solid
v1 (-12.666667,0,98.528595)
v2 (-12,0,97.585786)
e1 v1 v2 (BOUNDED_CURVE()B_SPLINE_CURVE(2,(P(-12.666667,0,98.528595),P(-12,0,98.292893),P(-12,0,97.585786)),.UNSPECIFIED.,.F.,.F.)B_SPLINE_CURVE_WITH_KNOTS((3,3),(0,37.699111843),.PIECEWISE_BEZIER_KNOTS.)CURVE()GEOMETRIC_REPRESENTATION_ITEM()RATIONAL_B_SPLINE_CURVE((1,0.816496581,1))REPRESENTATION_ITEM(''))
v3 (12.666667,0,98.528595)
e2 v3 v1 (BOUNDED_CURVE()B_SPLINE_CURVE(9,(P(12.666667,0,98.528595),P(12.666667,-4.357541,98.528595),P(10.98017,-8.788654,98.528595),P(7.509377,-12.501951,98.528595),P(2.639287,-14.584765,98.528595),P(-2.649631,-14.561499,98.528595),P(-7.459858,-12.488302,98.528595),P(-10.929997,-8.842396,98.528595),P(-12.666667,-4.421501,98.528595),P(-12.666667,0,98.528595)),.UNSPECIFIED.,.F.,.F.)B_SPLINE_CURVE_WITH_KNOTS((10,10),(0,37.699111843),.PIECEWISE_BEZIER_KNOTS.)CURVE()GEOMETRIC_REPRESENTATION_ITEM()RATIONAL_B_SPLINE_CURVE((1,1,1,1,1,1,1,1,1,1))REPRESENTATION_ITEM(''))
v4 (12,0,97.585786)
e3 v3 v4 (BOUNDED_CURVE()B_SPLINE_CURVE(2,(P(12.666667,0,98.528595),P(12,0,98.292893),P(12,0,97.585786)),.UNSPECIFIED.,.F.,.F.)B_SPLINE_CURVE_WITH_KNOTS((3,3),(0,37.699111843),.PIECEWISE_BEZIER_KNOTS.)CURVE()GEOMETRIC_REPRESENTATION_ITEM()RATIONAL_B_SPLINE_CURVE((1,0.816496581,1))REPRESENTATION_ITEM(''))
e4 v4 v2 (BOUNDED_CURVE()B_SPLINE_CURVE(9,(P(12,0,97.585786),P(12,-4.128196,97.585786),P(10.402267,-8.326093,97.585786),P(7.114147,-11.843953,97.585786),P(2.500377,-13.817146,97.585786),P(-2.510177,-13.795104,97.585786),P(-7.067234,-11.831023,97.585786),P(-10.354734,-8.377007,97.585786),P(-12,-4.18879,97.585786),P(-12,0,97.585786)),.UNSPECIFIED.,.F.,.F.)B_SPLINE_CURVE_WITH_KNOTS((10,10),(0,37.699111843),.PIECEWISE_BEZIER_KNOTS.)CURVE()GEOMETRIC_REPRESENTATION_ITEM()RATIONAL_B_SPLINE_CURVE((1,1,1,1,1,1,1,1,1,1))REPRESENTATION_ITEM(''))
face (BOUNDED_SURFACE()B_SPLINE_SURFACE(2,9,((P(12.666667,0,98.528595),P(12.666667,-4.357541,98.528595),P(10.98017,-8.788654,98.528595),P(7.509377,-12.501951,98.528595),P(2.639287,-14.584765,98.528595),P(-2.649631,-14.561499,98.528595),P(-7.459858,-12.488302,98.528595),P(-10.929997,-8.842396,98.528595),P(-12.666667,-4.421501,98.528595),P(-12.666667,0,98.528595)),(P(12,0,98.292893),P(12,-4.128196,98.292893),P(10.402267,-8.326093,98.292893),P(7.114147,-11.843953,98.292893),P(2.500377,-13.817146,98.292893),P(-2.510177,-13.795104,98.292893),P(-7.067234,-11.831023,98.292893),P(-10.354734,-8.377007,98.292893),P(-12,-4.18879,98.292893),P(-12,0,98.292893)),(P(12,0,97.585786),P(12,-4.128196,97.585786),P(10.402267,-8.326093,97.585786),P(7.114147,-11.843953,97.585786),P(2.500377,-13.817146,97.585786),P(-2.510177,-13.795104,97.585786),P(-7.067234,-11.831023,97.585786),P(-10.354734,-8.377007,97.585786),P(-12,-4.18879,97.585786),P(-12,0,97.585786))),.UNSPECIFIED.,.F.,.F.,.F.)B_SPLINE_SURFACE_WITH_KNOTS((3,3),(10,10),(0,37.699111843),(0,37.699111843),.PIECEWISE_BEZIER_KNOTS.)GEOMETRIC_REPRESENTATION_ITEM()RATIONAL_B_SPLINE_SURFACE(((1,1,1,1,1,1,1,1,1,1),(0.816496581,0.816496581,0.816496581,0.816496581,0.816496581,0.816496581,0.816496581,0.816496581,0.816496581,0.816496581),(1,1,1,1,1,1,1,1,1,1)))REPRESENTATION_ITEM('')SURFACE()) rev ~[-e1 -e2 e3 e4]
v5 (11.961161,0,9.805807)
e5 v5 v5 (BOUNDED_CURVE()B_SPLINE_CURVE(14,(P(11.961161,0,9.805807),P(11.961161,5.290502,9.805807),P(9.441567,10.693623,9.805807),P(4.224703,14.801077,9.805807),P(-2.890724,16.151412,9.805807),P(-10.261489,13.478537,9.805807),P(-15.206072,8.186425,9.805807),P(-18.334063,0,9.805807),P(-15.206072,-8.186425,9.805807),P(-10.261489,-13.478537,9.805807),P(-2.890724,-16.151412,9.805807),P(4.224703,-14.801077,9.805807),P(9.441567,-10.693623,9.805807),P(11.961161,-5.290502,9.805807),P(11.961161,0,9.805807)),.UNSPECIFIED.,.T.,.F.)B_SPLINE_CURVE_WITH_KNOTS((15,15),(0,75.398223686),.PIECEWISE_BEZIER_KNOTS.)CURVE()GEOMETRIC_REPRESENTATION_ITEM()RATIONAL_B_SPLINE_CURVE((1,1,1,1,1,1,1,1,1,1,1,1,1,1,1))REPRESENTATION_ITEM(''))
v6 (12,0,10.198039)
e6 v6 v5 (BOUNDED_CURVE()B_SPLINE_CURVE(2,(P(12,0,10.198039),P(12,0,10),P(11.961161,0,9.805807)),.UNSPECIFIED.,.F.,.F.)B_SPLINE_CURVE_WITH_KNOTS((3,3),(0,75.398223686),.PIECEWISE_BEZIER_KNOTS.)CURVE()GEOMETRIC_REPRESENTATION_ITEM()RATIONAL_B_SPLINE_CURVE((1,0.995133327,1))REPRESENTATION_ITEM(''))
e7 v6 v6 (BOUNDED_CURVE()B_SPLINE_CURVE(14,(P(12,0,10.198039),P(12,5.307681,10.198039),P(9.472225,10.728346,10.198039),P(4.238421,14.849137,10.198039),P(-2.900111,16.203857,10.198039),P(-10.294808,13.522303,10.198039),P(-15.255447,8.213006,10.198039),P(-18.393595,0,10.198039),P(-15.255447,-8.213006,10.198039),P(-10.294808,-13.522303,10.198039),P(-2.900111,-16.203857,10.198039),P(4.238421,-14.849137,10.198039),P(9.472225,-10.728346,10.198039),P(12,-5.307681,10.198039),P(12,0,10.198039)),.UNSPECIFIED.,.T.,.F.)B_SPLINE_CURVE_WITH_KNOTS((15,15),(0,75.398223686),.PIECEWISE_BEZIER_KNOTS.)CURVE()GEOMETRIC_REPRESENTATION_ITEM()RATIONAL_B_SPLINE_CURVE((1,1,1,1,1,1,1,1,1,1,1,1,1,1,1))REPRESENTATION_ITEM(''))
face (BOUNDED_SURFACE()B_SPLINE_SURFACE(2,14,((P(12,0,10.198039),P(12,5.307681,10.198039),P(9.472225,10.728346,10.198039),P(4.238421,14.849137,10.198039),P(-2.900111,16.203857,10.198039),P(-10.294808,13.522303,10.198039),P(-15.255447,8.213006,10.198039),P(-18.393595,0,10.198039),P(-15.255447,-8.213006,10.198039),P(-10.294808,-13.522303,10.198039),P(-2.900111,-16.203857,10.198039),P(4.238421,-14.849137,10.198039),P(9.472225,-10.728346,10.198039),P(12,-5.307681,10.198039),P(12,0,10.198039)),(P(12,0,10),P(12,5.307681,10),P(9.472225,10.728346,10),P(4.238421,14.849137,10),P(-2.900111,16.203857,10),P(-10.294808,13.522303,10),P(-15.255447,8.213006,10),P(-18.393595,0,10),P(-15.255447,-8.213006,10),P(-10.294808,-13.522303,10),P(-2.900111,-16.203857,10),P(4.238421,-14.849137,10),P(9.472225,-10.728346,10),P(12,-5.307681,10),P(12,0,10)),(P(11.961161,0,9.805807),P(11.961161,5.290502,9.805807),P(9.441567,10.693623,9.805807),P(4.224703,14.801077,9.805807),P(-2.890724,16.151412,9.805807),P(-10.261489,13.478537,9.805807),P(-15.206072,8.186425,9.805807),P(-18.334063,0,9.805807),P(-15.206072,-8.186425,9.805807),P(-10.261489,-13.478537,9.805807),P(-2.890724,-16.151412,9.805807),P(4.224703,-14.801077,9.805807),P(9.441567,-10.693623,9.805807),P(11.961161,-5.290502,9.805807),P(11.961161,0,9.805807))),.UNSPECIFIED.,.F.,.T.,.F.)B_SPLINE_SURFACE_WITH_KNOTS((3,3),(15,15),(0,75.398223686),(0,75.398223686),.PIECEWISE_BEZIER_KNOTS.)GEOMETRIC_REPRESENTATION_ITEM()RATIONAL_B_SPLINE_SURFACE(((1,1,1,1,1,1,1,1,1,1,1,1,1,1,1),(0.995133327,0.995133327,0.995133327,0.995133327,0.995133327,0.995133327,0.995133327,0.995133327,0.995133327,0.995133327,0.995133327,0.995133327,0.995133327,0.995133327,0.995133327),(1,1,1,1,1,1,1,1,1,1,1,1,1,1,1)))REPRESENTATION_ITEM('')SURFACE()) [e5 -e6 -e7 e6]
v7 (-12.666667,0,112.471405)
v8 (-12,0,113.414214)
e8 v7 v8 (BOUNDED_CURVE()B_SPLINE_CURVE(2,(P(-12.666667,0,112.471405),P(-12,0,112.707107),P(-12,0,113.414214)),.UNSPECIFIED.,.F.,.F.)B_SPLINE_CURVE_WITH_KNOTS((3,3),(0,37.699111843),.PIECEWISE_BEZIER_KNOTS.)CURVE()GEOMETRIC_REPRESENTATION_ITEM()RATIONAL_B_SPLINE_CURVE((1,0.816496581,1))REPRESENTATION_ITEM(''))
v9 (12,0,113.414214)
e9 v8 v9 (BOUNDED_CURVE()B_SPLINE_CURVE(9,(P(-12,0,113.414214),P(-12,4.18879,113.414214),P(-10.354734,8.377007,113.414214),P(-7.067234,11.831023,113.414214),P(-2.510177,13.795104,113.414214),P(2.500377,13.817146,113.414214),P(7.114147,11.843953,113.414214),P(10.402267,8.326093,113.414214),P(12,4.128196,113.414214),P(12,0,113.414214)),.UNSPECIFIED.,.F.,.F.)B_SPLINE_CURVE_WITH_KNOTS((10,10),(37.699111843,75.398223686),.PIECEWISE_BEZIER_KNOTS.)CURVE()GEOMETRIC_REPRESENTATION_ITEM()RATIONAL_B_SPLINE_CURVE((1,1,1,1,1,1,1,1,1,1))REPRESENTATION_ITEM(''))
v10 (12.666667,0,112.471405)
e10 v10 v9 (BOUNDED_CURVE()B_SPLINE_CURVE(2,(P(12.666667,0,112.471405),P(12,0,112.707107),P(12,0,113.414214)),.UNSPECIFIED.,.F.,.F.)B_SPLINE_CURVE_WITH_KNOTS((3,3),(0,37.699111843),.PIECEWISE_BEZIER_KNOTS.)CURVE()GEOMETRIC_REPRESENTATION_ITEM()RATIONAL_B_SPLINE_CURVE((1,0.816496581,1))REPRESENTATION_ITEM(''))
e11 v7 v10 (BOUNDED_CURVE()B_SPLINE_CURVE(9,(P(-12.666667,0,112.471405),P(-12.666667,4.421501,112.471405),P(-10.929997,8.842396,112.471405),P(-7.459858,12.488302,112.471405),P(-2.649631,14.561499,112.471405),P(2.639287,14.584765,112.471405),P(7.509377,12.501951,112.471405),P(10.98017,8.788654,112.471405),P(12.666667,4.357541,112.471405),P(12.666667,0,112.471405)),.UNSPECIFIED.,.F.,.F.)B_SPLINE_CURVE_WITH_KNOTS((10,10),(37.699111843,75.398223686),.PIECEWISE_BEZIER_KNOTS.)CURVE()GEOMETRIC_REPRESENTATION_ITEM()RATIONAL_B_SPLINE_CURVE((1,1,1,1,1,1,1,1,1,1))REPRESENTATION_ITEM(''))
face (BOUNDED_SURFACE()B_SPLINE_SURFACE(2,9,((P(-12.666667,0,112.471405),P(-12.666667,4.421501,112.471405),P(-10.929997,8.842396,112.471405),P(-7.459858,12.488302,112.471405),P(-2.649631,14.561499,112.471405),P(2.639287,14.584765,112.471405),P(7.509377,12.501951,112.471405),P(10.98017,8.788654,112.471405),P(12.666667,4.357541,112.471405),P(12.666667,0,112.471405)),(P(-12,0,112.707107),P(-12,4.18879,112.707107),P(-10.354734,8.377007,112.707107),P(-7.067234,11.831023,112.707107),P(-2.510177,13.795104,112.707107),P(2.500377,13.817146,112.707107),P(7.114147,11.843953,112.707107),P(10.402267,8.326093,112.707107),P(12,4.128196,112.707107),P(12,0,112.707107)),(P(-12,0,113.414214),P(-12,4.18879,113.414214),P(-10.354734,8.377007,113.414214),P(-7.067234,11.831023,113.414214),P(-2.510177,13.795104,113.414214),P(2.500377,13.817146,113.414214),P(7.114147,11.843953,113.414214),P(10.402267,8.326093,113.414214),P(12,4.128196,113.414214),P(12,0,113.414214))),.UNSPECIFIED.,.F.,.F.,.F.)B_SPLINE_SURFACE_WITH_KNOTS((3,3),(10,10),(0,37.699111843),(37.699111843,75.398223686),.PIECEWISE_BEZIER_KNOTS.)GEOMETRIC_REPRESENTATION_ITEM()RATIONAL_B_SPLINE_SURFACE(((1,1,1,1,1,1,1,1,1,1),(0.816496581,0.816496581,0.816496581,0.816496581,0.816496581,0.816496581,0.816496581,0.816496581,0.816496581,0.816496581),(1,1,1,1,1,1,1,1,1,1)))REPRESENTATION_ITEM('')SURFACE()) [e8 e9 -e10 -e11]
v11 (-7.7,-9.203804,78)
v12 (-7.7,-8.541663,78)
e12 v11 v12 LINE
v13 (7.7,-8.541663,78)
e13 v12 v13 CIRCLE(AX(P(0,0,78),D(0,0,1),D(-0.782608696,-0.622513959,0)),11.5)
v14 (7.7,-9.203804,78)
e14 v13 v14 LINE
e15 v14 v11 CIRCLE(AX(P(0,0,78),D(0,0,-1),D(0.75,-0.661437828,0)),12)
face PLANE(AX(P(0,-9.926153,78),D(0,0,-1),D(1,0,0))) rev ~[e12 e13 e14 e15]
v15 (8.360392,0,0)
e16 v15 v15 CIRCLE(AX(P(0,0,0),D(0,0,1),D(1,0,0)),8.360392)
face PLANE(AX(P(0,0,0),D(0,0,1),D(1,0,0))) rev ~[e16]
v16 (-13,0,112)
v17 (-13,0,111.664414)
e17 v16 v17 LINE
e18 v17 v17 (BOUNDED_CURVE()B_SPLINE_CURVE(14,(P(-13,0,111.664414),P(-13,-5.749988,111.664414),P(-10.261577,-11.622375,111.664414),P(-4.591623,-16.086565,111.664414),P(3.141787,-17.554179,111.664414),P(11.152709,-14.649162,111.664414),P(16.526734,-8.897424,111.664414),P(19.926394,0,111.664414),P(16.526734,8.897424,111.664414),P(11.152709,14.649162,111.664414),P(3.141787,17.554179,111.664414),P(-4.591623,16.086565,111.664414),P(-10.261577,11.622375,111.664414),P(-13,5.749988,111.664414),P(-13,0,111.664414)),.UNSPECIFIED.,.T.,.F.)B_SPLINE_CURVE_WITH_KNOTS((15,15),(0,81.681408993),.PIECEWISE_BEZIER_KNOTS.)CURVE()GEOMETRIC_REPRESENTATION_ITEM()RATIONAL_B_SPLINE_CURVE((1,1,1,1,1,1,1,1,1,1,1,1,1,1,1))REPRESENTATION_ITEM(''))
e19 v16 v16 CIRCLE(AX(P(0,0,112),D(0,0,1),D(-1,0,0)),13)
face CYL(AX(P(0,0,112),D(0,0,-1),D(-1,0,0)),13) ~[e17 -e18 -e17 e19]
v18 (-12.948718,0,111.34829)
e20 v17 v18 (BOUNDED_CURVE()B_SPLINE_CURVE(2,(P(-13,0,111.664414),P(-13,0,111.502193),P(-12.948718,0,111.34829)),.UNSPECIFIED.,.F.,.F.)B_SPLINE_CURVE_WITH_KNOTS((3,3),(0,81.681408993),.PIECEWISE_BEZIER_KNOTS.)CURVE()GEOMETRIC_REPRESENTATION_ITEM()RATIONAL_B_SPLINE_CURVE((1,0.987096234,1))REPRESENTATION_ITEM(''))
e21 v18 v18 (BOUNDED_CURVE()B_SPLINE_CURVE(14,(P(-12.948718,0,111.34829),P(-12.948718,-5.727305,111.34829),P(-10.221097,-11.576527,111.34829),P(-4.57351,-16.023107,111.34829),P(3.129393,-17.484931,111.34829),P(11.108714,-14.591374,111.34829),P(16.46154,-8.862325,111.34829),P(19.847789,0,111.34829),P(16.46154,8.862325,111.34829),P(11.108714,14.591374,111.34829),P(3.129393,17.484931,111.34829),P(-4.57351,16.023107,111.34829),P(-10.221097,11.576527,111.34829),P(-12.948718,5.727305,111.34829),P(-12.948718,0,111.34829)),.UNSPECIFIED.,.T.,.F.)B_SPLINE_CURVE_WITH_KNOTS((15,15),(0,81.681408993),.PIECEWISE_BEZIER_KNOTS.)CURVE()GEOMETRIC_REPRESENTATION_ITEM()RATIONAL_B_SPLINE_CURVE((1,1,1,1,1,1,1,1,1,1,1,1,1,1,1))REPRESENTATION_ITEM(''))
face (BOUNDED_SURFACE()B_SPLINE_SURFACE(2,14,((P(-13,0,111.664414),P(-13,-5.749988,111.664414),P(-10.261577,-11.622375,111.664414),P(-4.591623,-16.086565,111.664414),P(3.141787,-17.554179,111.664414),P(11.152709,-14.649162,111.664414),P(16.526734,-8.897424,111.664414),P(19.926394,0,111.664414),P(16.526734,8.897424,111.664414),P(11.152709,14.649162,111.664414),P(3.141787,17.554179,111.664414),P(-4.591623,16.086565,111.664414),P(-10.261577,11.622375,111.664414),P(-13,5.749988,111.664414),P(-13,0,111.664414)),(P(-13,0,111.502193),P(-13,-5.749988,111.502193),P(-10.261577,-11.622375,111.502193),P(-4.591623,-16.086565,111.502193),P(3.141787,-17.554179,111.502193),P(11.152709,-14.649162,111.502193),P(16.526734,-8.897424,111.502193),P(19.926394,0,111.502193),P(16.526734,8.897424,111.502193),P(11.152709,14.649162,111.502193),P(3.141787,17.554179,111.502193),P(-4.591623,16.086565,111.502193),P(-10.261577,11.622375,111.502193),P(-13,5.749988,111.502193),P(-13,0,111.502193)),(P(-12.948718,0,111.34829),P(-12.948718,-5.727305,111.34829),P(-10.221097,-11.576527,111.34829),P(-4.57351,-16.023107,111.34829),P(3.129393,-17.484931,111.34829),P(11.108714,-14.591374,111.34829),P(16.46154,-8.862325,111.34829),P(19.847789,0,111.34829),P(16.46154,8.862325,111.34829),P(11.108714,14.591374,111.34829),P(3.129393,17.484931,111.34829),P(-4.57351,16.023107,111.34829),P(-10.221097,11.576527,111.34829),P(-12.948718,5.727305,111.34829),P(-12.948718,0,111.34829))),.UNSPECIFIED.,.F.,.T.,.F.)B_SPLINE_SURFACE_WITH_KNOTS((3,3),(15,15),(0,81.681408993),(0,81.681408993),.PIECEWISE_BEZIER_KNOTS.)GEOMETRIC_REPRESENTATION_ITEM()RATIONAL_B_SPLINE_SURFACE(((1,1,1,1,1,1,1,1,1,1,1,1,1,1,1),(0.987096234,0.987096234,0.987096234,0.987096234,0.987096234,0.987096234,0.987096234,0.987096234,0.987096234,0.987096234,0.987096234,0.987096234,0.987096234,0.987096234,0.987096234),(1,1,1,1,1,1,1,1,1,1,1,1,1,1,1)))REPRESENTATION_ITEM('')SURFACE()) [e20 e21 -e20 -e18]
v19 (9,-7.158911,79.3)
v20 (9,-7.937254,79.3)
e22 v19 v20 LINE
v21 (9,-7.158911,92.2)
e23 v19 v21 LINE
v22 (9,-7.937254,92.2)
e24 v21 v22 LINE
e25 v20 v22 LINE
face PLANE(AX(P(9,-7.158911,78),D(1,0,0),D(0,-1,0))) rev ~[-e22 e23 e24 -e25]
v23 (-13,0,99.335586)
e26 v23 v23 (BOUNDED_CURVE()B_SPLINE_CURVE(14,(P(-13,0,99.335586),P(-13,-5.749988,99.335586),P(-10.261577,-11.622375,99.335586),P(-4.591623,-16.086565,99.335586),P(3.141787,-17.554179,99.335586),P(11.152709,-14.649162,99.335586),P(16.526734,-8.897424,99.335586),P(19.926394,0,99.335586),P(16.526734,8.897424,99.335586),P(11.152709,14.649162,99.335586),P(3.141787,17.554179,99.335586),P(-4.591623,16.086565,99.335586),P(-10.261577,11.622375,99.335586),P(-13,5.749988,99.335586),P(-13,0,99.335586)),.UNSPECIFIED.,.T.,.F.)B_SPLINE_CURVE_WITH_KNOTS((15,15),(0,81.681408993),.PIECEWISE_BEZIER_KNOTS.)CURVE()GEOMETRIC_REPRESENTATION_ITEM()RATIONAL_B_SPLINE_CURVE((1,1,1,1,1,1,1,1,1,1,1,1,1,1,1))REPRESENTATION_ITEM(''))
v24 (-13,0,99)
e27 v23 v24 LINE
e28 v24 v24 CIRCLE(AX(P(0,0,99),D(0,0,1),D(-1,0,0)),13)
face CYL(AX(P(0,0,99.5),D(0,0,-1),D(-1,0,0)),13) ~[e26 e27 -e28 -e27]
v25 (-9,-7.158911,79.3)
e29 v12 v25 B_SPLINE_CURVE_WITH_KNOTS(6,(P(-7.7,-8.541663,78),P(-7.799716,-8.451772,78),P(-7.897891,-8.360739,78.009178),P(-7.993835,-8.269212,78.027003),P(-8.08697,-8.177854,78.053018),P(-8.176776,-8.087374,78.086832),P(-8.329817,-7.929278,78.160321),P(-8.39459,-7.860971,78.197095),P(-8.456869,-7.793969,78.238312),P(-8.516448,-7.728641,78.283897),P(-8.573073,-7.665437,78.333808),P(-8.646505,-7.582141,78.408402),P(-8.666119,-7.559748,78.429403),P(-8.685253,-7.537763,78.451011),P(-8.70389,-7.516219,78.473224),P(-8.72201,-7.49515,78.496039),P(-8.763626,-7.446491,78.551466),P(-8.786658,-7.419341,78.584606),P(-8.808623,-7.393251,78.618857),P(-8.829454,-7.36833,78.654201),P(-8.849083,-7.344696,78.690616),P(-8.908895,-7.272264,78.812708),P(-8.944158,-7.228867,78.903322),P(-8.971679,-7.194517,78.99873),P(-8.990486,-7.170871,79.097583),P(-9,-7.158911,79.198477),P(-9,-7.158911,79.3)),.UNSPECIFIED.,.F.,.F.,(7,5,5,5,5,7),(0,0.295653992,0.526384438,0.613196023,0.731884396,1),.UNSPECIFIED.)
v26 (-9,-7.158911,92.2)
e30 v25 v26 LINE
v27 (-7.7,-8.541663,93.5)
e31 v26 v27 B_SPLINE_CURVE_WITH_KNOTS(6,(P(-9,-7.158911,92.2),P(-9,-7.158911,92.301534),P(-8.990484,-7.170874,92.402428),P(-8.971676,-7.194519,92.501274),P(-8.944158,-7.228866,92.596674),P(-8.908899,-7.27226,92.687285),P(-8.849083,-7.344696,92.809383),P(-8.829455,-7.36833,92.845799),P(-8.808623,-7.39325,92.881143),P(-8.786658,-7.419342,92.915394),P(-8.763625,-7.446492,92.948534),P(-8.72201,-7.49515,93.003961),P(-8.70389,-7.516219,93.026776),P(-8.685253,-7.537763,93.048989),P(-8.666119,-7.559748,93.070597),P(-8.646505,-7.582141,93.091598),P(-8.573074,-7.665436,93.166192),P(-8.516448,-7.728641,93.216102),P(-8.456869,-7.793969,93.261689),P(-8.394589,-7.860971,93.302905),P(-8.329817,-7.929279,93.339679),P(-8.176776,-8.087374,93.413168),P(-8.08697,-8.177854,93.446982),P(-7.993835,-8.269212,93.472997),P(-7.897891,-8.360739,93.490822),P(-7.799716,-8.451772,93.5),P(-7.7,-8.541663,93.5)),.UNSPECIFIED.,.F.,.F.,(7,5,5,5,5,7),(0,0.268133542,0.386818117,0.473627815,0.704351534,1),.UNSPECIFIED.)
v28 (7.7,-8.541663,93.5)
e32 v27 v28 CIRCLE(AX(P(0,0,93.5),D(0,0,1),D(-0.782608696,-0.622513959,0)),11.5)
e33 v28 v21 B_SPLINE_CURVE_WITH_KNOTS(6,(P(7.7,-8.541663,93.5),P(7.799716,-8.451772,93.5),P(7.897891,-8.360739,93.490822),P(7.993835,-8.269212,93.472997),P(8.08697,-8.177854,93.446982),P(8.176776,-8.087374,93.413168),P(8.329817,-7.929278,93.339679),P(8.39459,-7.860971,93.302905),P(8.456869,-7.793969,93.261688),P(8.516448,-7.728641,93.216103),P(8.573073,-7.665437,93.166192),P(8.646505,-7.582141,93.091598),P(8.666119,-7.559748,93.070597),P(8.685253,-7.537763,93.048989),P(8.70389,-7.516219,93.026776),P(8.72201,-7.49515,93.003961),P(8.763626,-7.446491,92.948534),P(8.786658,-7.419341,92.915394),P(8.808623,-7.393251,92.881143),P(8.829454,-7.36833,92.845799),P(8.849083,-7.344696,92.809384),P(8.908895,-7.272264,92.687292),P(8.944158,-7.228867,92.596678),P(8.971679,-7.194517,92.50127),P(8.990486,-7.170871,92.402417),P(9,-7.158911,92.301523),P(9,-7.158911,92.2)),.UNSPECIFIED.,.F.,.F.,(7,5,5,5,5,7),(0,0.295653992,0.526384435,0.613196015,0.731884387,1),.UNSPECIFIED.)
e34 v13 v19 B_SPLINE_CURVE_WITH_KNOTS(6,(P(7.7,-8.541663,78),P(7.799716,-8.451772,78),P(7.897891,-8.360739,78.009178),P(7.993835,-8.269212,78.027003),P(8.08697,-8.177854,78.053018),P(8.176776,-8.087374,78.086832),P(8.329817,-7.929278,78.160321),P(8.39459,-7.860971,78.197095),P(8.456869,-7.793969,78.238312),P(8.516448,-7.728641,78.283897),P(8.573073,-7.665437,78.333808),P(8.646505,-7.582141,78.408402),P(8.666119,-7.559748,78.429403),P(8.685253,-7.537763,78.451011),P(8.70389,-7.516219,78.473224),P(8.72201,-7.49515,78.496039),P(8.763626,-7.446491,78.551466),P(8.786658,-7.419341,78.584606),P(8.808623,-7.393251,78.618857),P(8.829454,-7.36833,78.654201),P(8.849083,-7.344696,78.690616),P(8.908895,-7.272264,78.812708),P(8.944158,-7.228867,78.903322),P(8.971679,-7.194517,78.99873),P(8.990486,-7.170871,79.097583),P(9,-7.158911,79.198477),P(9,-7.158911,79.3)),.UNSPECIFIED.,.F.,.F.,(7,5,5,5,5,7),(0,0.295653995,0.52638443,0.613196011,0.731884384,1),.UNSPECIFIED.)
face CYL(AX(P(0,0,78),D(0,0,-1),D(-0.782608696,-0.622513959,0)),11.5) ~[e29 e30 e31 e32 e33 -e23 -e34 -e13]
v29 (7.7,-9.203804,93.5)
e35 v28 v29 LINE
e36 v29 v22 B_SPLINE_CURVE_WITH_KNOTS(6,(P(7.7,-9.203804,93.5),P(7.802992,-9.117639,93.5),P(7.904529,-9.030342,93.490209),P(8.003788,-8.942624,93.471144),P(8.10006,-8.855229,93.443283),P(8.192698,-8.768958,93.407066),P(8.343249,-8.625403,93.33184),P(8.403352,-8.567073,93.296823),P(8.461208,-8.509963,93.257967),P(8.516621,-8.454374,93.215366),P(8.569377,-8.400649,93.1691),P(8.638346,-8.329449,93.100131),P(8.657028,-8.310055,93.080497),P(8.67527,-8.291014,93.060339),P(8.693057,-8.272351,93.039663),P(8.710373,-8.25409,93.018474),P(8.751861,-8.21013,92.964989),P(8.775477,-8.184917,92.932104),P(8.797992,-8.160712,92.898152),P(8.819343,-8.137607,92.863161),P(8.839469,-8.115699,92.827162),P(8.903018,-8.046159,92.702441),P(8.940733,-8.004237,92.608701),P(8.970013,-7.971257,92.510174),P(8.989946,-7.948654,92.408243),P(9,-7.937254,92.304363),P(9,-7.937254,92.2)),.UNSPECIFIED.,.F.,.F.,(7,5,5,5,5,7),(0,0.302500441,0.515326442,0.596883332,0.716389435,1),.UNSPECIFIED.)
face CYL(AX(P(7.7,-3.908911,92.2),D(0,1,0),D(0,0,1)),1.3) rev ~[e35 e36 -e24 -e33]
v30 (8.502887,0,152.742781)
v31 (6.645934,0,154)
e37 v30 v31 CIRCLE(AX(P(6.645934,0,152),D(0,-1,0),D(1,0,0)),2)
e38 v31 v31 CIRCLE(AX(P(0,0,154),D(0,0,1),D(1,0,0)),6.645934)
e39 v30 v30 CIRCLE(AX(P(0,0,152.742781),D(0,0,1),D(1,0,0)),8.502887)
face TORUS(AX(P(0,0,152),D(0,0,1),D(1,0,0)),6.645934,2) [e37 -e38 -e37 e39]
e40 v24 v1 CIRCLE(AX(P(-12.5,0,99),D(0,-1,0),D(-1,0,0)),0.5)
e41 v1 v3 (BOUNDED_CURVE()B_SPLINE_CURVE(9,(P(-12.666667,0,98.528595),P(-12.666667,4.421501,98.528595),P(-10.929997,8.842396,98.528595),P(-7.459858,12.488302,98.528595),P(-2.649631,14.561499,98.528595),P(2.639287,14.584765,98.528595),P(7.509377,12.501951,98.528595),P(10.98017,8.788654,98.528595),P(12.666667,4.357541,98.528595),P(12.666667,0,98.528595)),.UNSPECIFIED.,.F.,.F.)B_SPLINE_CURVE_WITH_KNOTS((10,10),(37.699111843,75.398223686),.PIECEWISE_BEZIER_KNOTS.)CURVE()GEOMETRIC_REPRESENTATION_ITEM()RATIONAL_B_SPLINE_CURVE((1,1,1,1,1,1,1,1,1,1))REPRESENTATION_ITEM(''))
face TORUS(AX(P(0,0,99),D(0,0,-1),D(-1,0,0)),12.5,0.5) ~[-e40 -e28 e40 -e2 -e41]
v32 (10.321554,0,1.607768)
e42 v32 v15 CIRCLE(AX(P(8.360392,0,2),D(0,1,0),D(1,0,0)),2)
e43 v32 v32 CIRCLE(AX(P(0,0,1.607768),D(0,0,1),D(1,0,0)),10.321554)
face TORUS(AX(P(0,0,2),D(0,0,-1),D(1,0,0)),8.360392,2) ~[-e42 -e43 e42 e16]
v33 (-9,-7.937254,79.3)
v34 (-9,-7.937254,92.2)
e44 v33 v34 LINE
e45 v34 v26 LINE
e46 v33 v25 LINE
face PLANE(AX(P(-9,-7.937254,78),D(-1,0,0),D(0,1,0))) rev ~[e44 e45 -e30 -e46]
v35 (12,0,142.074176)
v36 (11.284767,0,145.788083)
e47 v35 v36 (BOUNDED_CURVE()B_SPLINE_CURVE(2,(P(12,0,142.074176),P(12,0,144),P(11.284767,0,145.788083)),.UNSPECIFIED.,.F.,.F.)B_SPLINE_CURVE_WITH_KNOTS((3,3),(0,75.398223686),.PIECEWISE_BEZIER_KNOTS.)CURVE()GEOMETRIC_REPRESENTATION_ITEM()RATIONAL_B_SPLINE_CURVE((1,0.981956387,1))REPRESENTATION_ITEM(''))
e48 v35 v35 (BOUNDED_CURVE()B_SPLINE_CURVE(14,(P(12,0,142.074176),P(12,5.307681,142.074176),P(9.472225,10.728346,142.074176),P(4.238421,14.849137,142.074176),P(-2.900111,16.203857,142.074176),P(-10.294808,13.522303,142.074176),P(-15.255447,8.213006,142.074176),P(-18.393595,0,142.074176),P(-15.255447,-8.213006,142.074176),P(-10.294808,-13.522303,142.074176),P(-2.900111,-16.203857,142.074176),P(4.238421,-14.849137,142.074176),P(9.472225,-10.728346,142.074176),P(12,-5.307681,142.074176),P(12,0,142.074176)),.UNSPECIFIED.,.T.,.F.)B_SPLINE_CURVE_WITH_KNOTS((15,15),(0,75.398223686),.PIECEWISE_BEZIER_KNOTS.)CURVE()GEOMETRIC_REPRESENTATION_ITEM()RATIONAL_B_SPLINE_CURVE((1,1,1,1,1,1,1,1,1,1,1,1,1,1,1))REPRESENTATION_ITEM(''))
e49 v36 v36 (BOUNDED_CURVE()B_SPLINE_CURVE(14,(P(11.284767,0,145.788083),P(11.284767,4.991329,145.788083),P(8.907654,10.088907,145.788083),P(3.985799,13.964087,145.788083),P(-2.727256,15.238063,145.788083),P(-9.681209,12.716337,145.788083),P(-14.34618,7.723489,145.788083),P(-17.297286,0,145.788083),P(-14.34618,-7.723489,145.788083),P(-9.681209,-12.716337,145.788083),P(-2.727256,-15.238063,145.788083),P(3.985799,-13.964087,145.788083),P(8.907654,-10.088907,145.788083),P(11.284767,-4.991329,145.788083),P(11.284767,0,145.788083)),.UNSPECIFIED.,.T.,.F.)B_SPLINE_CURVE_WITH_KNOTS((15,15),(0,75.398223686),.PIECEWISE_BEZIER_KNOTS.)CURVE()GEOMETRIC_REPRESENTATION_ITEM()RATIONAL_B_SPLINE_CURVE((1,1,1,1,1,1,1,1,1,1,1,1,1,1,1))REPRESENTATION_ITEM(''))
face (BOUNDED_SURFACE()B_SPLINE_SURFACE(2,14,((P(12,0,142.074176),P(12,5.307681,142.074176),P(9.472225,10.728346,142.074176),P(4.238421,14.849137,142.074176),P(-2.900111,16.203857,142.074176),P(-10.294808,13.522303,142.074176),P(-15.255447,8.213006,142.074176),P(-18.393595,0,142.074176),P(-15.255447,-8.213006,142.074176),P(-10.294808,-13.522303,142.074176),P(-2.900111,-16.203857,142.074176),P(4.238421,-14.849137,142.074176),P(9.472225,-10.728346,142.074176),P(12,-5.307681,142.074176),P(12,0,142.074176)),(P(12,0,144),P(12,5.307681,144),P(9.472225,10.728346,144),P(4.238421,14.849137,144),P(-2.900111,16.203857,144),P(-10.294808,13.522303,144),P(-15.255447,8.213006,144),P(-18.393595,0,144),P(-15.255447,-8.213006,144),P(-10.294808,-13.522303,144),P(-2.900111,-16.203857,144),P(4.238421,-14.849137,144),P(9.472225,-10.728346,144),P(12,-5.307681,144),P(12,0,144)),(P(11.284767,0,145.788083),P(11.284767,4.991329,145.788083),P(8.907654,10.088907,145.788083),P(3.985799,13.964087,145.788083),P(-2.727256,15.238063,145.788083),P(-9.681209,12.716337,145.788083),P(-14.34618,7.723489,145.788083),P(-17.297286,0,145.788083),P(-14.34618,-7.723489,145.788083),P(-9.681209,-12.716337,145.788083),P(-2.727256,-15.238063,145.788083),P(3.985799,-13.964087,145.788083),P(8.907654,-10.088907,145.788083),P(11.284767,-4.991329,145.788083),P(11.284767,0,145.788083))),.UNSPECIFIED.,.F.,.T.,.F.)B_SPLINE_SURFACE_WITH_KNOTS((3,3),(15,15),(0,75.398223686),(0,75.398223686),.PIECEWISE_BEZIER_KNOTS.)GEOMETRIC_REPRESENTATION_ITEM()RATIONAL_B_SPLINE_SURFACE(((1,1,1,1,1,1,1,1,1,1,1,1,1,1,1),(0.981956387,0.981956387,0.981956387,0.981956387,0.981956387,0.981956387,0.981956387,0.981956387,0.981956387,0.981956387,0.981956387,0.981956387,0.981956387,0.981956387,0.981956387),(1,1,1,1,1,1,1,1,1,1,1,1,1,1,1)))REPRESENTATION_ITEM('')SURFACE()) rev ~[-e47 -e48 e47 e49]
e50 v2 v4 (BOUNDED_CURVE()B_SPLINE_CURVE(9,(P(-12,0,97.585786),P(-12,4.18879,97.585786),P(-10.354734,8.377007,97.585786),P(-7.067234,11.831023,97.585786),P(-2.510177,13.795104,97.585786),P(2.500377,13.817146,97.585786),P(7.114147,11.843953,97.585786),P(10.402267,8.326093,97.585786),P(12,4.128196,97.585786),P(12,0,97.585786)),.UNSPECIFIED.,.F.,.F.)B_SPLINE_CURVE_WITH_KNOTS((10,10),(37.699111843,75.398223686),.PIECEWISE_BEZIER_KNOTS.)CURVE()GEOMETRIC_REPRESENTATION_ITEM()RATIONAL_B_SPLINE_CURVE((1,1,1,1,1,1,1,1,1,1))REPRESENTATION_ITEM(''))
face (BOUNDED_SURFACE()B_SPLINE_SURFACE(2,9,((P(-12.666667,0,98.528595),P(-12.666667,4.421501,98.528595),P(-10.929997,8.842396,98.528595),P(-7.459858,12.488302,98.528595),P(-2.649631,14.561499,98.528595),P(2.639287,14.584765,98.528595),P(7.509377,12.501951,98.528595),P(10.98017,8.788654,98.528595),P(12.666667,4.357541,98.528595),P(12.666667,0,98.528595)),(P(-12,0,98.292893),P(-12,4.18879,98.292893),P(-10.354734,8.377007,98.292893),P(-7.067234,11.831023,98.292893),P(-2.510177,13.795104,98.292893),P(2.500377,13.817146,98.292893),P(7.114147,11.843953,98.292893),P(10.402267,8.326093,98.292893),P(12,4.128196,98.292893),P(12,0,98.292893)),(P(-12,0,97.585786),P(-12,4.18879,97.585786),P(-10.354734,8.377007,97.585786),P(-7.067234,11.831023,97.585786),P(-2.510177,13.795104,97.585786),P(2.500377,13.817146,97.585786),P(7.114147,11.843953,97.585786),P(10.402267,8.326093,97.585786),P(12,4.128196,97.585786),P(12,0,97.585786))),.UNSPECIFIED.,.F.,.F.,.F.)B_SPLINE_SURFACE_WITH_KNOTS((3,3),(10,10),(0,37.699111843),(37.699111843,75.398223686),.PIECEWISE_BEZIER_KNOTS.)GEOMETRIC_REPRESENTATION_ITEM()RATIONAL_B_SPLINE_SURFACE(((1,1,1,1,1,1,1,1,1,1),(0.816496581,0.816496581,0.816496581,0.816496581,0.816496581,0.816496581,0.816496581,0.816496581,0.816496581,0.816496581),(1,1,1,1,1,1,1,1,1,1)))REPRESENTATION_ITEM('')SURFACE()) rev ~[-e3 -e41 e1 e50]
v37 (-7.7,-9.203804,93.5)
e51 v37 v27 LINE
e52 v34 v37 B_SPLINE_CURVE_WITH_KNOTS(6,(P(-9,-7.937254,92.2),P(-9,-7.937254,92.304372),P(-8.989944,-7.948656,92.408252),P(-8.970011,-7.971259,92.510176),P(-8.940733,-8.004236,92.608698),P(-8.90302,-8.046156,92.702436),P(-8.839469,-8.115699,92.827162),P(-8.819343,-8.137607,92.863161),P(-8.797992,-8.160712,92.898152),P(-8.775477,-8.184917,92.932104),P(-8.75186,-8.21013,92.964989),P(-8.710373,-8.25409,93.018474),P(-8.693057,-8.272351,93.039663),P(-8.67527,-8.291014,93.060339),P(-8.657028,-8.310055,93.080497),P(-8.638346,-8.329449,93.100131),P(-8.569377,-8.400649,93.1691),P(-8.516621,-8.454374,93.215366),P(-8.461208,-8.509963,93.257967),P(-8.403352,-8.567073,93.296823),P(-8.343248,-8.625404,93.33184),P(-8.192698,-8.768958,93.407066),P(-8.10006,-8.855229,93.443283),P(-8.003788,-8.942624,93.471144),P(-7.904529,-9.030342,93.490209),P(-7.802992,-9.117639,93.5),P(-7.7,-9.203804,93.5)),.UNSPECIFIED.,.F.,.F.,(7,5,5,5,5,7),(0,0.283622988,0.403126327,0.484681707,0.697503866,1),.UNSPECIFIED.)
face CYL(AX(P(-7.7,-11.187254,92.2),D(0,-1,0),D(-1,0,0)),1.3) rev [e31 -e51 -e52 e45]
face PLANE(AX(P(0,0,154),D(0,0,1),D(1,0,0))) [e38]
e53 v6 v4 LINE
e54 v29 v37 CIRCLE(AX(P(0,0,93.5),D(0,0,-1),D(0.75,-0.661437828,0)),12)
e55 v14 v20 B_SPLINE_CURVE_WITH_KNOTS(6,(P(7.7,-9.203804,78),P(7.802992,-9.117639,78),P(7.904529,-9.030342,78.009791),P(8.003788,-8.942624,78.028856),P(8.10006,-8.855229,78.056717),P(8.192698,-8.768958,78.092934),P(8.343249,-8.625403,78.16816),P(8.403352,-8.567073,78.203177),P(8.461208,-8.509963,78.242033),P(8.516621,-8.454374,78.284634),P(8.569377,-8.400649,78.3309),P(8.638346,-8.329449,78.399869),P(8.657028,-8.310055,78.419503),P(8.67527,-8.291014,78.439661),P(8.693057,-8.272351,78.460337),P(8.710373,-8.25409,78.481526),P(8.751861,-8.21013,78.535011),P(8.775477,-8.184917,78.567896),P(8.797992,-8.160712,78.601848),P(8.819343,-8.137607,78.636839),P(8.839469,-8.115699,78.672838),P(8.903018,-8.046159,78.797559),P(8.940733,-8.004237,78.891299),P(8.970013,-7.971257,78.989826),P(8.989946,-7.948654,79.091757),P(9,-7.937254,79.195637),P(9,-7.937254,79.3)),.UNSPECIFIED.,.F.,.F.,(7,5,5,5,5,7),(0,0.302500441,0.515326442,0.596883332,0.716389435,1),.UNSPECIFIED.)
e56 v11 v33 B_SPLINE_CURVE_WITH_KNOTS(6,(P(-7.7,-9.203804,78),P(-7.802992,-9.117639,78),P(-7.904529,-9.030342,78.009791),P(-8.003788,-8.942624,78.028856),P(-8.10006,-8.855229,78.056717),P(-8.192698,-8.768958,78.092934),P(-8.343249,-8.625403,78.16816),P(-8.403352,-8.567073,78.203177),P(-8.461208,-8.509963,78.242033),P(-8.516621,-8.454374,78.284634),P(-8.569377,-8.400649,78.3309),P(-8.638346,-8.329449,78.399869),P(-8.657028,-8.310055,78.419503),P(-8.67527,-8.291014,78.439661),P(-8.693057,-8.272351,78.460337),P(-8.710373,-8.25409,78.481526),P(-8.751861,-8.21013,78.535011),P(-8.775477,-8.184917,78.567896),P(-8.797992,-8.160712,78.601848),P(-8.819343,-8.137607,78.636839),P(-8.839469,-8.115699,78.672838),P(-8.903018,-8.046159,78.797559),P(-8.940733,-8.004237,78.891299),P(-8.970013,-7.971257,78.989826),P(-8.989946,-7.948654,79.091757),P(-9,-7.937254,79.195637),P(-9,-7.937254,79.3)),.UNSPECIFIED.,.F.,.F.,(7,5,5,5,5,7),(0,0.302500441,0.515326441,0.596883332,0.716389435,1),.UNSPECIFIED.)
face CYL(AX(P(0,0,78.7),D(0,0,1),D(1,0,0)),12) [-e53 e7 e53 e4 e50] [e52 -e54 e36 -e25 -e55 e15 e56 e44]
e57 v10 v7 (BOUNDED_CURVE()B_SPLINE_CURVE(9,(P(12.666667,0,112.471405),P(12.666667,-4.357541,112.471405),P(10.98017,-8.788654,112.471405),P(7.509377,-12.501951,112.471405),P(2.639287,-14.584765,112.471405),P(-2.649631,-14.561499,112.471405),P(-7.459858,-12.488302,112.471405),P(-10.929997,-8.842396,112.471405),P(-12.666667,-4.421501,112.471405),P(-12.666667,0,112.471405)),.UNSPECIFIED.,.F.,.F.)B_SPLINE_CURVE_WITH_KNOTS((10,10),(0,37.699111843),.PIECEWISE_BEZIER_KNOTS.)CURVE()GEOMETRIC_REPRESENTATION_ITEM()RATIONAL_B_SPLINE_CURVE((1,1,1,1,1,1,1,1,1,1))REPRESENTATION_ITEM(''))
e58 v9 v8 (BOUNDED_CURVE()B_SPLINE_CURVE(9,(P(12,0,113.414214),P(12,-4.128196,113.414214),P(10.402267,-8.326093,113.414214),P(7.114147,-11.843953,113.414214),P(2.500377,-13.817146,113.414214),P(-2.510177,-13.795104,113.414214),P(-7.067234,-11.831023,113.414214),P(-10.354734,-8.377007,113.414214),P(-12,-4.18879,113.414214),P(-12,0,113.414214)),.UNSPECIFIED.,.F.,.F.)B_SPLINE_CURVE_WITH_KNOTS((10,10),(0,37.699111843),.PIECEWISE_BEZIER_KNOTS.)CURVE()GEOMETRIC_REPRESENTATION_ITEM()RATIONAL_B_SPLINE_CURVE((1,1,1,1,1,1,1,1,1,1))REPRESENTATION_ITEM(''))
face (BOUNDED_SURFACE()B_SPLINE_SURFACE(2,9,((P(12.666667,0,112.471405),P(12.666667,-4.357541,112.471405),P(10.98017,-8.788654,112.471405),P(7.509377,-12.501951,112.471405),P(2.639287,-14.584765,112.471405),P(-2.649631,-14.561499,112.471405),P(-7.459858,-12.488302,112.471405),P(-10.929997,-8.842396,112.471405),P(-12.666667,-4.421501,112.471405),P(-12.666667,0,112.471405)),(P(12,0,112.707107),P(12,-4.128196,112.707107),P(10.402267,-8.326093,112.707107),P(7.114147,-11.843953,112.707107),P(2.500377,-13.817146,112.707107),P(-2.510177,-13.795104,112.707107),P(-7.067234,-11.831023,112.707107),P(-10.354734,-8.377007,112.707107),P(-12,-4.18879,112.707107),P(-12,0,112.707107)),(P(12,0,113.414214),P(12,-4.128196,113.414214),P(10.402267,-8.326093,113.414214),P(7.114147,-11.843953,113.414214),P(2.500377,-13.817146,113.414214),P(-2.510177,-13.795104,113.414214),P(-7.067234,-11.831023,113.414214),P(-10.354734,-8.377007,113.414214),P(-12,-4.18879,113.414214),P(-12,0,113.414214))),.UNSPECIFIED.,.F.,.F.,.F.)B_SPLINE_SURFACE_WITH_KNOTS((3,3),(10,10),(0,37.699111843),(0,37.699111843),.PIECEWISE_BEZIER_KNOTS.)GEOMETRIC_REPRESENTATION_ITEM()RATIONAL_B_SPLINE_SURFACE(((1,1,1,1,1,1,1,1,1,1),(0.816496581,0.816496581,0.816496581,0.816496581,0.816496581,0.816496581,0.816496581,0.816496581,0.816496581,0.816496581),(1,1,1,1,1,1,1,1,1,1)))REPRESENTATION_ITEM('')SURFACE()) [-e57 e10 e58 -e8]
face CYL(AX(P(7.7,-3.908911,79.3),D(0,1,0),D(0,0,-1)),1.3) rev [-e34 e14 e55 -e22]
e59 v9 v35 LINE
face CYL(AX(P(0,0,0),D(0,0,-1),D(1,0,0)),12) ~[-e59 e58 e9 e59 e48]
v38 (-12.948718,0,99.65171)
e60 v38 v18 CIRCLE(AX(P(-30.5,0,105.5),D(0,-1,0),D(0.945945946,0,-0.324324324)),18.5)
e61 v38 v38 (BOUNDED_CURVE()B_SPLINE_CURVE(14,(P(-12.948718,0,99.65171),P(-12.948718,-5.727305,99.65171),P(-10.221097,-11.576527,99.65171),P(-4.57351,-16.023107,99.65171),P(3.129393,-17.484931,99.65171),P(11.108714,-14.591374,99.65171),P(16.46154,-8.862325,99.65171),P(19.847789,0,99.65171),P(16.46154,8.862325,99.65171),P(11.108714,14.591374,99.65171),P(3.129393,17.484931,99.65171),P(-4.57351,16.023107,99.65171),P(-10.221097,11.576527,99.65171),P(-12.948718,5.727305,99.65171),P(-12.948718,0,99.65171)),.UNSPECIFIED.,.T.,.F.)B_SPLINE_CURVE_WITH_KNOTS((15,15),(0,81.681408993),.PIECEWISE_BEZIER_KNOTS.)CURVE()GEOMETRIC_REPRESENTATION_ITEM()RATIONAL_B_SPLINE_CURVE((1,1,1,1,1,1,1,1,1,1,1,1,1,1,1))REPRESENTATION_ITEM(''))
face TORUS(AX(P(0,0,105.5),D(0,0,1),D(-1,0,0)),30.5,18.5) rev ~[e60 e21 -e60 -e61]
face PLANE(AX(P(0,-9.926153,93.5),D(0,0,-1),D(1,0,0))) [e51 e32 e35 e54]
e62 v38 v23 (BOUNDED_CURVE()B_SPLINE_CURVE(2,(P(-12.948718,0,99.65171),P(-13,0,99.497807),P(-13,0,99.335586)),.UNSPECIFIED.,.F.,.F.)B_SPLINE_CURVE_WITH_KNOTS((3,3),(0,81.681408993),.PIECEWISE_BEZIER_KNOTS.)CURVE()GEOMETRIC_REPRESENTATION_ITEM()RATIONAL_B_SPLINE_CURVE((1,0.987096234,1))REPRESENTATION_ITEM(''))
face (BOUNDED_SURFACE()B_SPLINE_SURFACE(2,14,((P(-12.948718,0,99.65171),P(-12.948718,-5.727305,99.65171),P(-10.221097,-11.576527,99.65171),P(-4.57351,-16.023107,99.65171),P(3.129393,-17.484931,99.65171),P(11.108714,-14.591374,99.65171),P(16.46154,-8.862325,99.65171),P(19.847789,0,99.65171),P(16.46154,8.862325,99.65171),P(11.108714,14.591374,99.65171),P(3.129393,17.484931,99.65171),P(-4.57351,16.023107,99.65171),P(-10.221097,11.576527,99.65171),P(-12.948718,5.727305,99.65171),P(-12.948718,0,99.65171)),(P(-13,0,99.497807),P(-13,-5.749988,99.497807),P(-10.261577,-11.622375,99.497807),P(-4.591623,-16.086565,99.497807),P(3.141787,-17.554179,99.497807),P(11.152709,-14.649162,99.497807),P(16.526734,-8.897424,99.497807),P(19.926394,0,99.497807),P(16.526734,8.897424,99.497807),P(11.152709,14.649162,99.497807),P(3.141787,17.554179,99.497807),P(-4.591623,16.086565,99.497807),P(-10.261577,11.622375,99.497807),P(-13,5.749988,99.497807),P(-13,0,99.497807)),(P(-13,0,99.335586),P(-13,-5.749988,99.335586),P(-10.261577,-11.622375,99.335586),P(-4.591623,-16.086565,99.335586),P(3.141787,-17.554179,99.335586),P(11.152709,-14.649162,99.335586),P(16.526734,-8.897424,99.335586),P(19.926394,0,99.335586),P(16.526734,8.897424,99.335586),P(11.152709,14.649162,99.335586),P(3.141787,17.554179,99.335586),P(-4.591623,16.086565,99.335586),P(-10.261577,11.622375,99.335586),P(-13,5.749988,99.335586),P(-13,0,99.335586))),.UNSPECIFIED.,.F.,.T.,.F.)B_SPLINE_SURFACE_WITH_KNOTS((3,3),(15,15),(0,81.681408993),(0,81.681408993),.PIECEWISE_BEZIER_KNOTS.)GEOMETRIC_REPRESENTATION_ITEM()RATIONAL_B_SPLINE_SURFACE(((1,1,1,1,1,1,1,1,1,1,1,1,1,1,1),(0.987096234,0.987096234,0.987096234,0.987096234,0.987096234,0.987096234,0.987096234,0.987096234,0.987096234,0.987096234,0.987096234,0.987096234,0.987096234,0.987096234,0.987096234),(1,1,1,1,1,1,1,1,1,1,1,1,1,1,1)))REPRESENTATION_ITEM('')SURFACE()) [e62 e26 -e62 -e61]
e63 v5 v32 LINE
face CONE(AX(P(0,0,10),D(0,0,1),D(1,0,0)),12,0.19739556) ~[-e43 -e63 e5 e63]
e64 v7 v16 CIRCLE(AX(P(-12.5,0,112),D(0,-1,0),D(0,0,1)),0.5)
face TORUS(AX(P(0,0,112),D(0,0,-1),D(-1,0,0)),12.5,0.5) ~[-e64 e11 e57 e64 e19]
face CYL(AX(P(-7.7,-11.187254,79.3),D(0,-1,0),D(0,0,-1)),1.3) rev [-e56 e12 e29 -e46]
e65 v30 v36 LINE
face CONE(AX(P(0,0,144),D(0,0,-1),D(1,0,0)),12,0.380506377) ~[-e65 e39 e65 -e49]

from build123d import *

# Parameters (mm, degrees)
F0_R          = 12
F1_DEPTH      = 154
F2_SIZE2      = 2
F2_SIZE       = 10
F3_SIZE2      = 10
F3_SIZE       = 4
F6_R          = 1
F7_R          = 10
F8_R          = 2
F11_DEPTH     = 15.5
F12_T4_DEPTH  = 7.2783434016
F12_S5_R      = 12
F12_T6_DEPTH  = 5
F12_T10_DEPTH = 7.2783434016
F12_S11_R     = 12
F12_T12_DEPTH = 5
F12_T16_DEPTH = 7.2783434016
F12_S17_R     = 12
F12_T18_DEPTH = 5
F12_T22_DEPTH = 7.2783434016
F12_S23_R     = 12
F12_T24_DEPTH = 5


# Not quite as in the source:
# - a fillet or chamfer that OpenCascade refuses, or shapes differently, is made with other operations: its cross-section is extruded or revolved along the edge and cut away or added
# - a feature names something its author has since deleted; it is built from what else it names


with BuildPart() as f1:
    # F0 (on Top) → F1 (new body)
    with BuildSketch(Plane.XY):
        Circle(F0_R)
    extrude(amount=F1_DEPTH)

    # F2
    f2_edges = [f1.edges().sort_by_distance(p)[0] for p in [
        (-12, 0, 0),
    ]]
    f2_side = f1.faces().sort_by_distance((-12, 0, 77))[0]
    chamfer(f2_edges, length=F2_SIZE, length2=F2_SIZE2, reference=f2_side)

    # F3
    f3_edges = [f1.edges().sort_by_distance(p)[0] for p in [
        (-12, 0, 154),
    ]]
    f3_side = f1.faces().sort_by_distance((0, 0, 154))[0]
    chamfer(f3_edges, length=F3_SIZE, length2=F3_SIZE2, reference=f3_side)

    # F4 (on Front) → F5 (revolve)
    with BuildSketch(Plane.XZ):
        with BuildLine():
            Line((0, 98.5), (0, 112.5))
            Line((0, 112.5), (-12.5, 112.5))
            ThreePointArc((-12.5, 112.5), (-12.8535533906, 112.3535533906), (-13, 112))
            Line((-13, 112), (-13, 111.5))
            ThreePointArc((-13, 111.5), (-12, 105.5), (-13, 99.5))
            Line((-13, 99.5), (-13, 99))
            ThreePointArc((-13, 99), (-12.8535533906, 98.6464466094), (-12.5, 98.5))
            Line((-12.5, 98.5), (0, 98.5))
        make_face()
    revolve(axis=Axis((0, 0, 105.5), (0, 0, 1)))

    # F6
    f6_edges = [f1.edges().sort_by_distance(p)[0] for p in [
        (-12, 0, 112.5),
        (-12, 0, 98.5),
        (13, 0, 99.5),
        (13, 0, 111.5),
    ]]
    fillet(f6_edges, radius=F6_R)

    # F7
    f7_edges = [f1.edges().sort_by_distance(p)[0] for p in [
        (-12, 0, 144),
    ]]
    fillet(f7_edges, radius=F7_R)

    # F8
    f8_edges = [f1.edges().sort_by_distance(p)[0] for p in [
        (-8, 0, 154),
        (-12, 0, 10),
        (-10, 0, 0),
    ]]
    fillet(f8_edges, radius=F8_R)

    # F10 (on offset) → F11 (cut)
    with BuildSketch(Plane(origin=(0, 0, 78), x_dir=(1, 0, 0), z_dir=(0, 0, -1))):
        with BuildLine():
            ThreePointArc((-9, 7.1589105316), (0, 11.5), (9, 7.1589105316))
            Line((9, 7.1589105316), (9, 7.9372539332))
            ThreePointArc((9, 7.9372539332), (0, 12), (-9, 7.9372539332))
            Line((-9, 7.9372539332), (-9, 7.1589105316))
        make_face()
    extrude(amount=-F11_DEPTH, mode=Mode.SUBTRACT)

    # F12: fillet of radius 1.3 on 4 edges, made by hand


with BuildPart() as f12_tool2:
    # F12_s3 → F12_t4 (new body)
    with BuildSketch(Plane.XZ.offset(11.1872539332)):
        with BuildLine():
            ThreePointArc((-9, 92.2), (-8.6192388155, 93.1192388155), (-7.7, 93.5))
            Line((-7.7, 93.5), (-9, 93.5))
            Line((-9, 93.5), (-9, 92.2))
        make_face()
    extrude(amount=-F12_T4_DEPTH)

    # F12_s5 → F12_t6 (intersect, symmetric)
    with BuildSketch(Plane.XY.offset(92.8)):
        Circle(F12_S5_R)
    extrude(amount=F12_T6_DEPTH, both=True, mode=Mode.INTERSECT)


with BuildPart() as f1_1:
    add(f1.part)

    # F12_t1: union F12_tool2
    add(f12_tool2.part)


with BuildPart() as f12_tool8:
    # F12_s9 → F12_t10 (new body)
    with BuildSketch(Plane.XZ.offset(3.9089105316)):
        with BuildLine():
            ThreePointArc((7.7, 93.5), (8.6192388155, 93.1192388155), (9, 92.2))
            Line((9, 92.2), (9, 93.5))
            Line((9, 93.5), (7.7, 93.5))
        make_face()
    extrude(amount=F12_T10_DEPTH)

    # F12_s11 → F12_t12 (intersect, symmetric)
    with BuildSketch(Plane.XY.offset(92.8)):
        Circle(F12_S11_R)
    extrude(amount=F12_T12_DEPTH, both=True, mode=Mode.INTERSECT)


with BuildPart() as f1_2:
    add(f1_1.part)

    # F12_t7: union F12_tool8
    add(f12_tool8.part)


with BuildPart() as f12_tool14:
    # F12_s15 → F12_t16 (new body)
    with BuildSketch(Plane.XZ.offset(3.9089105316)):
        with BuildLine():
            ThreePointArc((7.7, 78), (8.6192388155, 78.3807611845), (9, 79.3))
            Line((9, 79.3), (9, 78))
            Line((9, 78), (7.7, 78))
        make_face()
    extrude(amount=F12_T16_DEPTH)

    # F12_s17 → F12_t18 (intersect, symmetric)
    with BuildSketch(Plane.XY.offset(78.7)):
        Circle(F12_S17_R)
    extrude(amount=F12_T18_DEPTH, both=True, mode=Mode.INTERSECT)


with BuildPart() as f1_3:
    add(f1_2.part)

    # F12_t13: union F12_tool14
    add(f12_tool14.part)


with BuildPart() as f12_tool20:
    # F12_s21 → F12_t22 (new body)
    with BuildSketch(Plane.XZ.offset(11.1872539332)):
        with BuildLine():
            ThreePointArc((-7.7, 78), (-8.6192388155, 78.3807611845), (-9, 79.3))
            Line((-9, 79.3), (-9, 78))
            Line((-9, 78), (-7.7, 78))
        make_face()
    extrude(amount=-F12_T22_DEPTH)

    # F12_s23 → F12_t24 (intersect, symmetric)
    with BuildSketch(Plane.XY.offset(78.7)):
        Circle(F12_S23_R)
    extrude(amount=F12_T24_DEPTH, both=True, mode=Mode.INTERSECT)


with BuildPart() as f1_4:
    add(f1_3.part)

    # F12_t19: union F12_tool20
    add(f12_tool20.part)


solid = f1_4.part
